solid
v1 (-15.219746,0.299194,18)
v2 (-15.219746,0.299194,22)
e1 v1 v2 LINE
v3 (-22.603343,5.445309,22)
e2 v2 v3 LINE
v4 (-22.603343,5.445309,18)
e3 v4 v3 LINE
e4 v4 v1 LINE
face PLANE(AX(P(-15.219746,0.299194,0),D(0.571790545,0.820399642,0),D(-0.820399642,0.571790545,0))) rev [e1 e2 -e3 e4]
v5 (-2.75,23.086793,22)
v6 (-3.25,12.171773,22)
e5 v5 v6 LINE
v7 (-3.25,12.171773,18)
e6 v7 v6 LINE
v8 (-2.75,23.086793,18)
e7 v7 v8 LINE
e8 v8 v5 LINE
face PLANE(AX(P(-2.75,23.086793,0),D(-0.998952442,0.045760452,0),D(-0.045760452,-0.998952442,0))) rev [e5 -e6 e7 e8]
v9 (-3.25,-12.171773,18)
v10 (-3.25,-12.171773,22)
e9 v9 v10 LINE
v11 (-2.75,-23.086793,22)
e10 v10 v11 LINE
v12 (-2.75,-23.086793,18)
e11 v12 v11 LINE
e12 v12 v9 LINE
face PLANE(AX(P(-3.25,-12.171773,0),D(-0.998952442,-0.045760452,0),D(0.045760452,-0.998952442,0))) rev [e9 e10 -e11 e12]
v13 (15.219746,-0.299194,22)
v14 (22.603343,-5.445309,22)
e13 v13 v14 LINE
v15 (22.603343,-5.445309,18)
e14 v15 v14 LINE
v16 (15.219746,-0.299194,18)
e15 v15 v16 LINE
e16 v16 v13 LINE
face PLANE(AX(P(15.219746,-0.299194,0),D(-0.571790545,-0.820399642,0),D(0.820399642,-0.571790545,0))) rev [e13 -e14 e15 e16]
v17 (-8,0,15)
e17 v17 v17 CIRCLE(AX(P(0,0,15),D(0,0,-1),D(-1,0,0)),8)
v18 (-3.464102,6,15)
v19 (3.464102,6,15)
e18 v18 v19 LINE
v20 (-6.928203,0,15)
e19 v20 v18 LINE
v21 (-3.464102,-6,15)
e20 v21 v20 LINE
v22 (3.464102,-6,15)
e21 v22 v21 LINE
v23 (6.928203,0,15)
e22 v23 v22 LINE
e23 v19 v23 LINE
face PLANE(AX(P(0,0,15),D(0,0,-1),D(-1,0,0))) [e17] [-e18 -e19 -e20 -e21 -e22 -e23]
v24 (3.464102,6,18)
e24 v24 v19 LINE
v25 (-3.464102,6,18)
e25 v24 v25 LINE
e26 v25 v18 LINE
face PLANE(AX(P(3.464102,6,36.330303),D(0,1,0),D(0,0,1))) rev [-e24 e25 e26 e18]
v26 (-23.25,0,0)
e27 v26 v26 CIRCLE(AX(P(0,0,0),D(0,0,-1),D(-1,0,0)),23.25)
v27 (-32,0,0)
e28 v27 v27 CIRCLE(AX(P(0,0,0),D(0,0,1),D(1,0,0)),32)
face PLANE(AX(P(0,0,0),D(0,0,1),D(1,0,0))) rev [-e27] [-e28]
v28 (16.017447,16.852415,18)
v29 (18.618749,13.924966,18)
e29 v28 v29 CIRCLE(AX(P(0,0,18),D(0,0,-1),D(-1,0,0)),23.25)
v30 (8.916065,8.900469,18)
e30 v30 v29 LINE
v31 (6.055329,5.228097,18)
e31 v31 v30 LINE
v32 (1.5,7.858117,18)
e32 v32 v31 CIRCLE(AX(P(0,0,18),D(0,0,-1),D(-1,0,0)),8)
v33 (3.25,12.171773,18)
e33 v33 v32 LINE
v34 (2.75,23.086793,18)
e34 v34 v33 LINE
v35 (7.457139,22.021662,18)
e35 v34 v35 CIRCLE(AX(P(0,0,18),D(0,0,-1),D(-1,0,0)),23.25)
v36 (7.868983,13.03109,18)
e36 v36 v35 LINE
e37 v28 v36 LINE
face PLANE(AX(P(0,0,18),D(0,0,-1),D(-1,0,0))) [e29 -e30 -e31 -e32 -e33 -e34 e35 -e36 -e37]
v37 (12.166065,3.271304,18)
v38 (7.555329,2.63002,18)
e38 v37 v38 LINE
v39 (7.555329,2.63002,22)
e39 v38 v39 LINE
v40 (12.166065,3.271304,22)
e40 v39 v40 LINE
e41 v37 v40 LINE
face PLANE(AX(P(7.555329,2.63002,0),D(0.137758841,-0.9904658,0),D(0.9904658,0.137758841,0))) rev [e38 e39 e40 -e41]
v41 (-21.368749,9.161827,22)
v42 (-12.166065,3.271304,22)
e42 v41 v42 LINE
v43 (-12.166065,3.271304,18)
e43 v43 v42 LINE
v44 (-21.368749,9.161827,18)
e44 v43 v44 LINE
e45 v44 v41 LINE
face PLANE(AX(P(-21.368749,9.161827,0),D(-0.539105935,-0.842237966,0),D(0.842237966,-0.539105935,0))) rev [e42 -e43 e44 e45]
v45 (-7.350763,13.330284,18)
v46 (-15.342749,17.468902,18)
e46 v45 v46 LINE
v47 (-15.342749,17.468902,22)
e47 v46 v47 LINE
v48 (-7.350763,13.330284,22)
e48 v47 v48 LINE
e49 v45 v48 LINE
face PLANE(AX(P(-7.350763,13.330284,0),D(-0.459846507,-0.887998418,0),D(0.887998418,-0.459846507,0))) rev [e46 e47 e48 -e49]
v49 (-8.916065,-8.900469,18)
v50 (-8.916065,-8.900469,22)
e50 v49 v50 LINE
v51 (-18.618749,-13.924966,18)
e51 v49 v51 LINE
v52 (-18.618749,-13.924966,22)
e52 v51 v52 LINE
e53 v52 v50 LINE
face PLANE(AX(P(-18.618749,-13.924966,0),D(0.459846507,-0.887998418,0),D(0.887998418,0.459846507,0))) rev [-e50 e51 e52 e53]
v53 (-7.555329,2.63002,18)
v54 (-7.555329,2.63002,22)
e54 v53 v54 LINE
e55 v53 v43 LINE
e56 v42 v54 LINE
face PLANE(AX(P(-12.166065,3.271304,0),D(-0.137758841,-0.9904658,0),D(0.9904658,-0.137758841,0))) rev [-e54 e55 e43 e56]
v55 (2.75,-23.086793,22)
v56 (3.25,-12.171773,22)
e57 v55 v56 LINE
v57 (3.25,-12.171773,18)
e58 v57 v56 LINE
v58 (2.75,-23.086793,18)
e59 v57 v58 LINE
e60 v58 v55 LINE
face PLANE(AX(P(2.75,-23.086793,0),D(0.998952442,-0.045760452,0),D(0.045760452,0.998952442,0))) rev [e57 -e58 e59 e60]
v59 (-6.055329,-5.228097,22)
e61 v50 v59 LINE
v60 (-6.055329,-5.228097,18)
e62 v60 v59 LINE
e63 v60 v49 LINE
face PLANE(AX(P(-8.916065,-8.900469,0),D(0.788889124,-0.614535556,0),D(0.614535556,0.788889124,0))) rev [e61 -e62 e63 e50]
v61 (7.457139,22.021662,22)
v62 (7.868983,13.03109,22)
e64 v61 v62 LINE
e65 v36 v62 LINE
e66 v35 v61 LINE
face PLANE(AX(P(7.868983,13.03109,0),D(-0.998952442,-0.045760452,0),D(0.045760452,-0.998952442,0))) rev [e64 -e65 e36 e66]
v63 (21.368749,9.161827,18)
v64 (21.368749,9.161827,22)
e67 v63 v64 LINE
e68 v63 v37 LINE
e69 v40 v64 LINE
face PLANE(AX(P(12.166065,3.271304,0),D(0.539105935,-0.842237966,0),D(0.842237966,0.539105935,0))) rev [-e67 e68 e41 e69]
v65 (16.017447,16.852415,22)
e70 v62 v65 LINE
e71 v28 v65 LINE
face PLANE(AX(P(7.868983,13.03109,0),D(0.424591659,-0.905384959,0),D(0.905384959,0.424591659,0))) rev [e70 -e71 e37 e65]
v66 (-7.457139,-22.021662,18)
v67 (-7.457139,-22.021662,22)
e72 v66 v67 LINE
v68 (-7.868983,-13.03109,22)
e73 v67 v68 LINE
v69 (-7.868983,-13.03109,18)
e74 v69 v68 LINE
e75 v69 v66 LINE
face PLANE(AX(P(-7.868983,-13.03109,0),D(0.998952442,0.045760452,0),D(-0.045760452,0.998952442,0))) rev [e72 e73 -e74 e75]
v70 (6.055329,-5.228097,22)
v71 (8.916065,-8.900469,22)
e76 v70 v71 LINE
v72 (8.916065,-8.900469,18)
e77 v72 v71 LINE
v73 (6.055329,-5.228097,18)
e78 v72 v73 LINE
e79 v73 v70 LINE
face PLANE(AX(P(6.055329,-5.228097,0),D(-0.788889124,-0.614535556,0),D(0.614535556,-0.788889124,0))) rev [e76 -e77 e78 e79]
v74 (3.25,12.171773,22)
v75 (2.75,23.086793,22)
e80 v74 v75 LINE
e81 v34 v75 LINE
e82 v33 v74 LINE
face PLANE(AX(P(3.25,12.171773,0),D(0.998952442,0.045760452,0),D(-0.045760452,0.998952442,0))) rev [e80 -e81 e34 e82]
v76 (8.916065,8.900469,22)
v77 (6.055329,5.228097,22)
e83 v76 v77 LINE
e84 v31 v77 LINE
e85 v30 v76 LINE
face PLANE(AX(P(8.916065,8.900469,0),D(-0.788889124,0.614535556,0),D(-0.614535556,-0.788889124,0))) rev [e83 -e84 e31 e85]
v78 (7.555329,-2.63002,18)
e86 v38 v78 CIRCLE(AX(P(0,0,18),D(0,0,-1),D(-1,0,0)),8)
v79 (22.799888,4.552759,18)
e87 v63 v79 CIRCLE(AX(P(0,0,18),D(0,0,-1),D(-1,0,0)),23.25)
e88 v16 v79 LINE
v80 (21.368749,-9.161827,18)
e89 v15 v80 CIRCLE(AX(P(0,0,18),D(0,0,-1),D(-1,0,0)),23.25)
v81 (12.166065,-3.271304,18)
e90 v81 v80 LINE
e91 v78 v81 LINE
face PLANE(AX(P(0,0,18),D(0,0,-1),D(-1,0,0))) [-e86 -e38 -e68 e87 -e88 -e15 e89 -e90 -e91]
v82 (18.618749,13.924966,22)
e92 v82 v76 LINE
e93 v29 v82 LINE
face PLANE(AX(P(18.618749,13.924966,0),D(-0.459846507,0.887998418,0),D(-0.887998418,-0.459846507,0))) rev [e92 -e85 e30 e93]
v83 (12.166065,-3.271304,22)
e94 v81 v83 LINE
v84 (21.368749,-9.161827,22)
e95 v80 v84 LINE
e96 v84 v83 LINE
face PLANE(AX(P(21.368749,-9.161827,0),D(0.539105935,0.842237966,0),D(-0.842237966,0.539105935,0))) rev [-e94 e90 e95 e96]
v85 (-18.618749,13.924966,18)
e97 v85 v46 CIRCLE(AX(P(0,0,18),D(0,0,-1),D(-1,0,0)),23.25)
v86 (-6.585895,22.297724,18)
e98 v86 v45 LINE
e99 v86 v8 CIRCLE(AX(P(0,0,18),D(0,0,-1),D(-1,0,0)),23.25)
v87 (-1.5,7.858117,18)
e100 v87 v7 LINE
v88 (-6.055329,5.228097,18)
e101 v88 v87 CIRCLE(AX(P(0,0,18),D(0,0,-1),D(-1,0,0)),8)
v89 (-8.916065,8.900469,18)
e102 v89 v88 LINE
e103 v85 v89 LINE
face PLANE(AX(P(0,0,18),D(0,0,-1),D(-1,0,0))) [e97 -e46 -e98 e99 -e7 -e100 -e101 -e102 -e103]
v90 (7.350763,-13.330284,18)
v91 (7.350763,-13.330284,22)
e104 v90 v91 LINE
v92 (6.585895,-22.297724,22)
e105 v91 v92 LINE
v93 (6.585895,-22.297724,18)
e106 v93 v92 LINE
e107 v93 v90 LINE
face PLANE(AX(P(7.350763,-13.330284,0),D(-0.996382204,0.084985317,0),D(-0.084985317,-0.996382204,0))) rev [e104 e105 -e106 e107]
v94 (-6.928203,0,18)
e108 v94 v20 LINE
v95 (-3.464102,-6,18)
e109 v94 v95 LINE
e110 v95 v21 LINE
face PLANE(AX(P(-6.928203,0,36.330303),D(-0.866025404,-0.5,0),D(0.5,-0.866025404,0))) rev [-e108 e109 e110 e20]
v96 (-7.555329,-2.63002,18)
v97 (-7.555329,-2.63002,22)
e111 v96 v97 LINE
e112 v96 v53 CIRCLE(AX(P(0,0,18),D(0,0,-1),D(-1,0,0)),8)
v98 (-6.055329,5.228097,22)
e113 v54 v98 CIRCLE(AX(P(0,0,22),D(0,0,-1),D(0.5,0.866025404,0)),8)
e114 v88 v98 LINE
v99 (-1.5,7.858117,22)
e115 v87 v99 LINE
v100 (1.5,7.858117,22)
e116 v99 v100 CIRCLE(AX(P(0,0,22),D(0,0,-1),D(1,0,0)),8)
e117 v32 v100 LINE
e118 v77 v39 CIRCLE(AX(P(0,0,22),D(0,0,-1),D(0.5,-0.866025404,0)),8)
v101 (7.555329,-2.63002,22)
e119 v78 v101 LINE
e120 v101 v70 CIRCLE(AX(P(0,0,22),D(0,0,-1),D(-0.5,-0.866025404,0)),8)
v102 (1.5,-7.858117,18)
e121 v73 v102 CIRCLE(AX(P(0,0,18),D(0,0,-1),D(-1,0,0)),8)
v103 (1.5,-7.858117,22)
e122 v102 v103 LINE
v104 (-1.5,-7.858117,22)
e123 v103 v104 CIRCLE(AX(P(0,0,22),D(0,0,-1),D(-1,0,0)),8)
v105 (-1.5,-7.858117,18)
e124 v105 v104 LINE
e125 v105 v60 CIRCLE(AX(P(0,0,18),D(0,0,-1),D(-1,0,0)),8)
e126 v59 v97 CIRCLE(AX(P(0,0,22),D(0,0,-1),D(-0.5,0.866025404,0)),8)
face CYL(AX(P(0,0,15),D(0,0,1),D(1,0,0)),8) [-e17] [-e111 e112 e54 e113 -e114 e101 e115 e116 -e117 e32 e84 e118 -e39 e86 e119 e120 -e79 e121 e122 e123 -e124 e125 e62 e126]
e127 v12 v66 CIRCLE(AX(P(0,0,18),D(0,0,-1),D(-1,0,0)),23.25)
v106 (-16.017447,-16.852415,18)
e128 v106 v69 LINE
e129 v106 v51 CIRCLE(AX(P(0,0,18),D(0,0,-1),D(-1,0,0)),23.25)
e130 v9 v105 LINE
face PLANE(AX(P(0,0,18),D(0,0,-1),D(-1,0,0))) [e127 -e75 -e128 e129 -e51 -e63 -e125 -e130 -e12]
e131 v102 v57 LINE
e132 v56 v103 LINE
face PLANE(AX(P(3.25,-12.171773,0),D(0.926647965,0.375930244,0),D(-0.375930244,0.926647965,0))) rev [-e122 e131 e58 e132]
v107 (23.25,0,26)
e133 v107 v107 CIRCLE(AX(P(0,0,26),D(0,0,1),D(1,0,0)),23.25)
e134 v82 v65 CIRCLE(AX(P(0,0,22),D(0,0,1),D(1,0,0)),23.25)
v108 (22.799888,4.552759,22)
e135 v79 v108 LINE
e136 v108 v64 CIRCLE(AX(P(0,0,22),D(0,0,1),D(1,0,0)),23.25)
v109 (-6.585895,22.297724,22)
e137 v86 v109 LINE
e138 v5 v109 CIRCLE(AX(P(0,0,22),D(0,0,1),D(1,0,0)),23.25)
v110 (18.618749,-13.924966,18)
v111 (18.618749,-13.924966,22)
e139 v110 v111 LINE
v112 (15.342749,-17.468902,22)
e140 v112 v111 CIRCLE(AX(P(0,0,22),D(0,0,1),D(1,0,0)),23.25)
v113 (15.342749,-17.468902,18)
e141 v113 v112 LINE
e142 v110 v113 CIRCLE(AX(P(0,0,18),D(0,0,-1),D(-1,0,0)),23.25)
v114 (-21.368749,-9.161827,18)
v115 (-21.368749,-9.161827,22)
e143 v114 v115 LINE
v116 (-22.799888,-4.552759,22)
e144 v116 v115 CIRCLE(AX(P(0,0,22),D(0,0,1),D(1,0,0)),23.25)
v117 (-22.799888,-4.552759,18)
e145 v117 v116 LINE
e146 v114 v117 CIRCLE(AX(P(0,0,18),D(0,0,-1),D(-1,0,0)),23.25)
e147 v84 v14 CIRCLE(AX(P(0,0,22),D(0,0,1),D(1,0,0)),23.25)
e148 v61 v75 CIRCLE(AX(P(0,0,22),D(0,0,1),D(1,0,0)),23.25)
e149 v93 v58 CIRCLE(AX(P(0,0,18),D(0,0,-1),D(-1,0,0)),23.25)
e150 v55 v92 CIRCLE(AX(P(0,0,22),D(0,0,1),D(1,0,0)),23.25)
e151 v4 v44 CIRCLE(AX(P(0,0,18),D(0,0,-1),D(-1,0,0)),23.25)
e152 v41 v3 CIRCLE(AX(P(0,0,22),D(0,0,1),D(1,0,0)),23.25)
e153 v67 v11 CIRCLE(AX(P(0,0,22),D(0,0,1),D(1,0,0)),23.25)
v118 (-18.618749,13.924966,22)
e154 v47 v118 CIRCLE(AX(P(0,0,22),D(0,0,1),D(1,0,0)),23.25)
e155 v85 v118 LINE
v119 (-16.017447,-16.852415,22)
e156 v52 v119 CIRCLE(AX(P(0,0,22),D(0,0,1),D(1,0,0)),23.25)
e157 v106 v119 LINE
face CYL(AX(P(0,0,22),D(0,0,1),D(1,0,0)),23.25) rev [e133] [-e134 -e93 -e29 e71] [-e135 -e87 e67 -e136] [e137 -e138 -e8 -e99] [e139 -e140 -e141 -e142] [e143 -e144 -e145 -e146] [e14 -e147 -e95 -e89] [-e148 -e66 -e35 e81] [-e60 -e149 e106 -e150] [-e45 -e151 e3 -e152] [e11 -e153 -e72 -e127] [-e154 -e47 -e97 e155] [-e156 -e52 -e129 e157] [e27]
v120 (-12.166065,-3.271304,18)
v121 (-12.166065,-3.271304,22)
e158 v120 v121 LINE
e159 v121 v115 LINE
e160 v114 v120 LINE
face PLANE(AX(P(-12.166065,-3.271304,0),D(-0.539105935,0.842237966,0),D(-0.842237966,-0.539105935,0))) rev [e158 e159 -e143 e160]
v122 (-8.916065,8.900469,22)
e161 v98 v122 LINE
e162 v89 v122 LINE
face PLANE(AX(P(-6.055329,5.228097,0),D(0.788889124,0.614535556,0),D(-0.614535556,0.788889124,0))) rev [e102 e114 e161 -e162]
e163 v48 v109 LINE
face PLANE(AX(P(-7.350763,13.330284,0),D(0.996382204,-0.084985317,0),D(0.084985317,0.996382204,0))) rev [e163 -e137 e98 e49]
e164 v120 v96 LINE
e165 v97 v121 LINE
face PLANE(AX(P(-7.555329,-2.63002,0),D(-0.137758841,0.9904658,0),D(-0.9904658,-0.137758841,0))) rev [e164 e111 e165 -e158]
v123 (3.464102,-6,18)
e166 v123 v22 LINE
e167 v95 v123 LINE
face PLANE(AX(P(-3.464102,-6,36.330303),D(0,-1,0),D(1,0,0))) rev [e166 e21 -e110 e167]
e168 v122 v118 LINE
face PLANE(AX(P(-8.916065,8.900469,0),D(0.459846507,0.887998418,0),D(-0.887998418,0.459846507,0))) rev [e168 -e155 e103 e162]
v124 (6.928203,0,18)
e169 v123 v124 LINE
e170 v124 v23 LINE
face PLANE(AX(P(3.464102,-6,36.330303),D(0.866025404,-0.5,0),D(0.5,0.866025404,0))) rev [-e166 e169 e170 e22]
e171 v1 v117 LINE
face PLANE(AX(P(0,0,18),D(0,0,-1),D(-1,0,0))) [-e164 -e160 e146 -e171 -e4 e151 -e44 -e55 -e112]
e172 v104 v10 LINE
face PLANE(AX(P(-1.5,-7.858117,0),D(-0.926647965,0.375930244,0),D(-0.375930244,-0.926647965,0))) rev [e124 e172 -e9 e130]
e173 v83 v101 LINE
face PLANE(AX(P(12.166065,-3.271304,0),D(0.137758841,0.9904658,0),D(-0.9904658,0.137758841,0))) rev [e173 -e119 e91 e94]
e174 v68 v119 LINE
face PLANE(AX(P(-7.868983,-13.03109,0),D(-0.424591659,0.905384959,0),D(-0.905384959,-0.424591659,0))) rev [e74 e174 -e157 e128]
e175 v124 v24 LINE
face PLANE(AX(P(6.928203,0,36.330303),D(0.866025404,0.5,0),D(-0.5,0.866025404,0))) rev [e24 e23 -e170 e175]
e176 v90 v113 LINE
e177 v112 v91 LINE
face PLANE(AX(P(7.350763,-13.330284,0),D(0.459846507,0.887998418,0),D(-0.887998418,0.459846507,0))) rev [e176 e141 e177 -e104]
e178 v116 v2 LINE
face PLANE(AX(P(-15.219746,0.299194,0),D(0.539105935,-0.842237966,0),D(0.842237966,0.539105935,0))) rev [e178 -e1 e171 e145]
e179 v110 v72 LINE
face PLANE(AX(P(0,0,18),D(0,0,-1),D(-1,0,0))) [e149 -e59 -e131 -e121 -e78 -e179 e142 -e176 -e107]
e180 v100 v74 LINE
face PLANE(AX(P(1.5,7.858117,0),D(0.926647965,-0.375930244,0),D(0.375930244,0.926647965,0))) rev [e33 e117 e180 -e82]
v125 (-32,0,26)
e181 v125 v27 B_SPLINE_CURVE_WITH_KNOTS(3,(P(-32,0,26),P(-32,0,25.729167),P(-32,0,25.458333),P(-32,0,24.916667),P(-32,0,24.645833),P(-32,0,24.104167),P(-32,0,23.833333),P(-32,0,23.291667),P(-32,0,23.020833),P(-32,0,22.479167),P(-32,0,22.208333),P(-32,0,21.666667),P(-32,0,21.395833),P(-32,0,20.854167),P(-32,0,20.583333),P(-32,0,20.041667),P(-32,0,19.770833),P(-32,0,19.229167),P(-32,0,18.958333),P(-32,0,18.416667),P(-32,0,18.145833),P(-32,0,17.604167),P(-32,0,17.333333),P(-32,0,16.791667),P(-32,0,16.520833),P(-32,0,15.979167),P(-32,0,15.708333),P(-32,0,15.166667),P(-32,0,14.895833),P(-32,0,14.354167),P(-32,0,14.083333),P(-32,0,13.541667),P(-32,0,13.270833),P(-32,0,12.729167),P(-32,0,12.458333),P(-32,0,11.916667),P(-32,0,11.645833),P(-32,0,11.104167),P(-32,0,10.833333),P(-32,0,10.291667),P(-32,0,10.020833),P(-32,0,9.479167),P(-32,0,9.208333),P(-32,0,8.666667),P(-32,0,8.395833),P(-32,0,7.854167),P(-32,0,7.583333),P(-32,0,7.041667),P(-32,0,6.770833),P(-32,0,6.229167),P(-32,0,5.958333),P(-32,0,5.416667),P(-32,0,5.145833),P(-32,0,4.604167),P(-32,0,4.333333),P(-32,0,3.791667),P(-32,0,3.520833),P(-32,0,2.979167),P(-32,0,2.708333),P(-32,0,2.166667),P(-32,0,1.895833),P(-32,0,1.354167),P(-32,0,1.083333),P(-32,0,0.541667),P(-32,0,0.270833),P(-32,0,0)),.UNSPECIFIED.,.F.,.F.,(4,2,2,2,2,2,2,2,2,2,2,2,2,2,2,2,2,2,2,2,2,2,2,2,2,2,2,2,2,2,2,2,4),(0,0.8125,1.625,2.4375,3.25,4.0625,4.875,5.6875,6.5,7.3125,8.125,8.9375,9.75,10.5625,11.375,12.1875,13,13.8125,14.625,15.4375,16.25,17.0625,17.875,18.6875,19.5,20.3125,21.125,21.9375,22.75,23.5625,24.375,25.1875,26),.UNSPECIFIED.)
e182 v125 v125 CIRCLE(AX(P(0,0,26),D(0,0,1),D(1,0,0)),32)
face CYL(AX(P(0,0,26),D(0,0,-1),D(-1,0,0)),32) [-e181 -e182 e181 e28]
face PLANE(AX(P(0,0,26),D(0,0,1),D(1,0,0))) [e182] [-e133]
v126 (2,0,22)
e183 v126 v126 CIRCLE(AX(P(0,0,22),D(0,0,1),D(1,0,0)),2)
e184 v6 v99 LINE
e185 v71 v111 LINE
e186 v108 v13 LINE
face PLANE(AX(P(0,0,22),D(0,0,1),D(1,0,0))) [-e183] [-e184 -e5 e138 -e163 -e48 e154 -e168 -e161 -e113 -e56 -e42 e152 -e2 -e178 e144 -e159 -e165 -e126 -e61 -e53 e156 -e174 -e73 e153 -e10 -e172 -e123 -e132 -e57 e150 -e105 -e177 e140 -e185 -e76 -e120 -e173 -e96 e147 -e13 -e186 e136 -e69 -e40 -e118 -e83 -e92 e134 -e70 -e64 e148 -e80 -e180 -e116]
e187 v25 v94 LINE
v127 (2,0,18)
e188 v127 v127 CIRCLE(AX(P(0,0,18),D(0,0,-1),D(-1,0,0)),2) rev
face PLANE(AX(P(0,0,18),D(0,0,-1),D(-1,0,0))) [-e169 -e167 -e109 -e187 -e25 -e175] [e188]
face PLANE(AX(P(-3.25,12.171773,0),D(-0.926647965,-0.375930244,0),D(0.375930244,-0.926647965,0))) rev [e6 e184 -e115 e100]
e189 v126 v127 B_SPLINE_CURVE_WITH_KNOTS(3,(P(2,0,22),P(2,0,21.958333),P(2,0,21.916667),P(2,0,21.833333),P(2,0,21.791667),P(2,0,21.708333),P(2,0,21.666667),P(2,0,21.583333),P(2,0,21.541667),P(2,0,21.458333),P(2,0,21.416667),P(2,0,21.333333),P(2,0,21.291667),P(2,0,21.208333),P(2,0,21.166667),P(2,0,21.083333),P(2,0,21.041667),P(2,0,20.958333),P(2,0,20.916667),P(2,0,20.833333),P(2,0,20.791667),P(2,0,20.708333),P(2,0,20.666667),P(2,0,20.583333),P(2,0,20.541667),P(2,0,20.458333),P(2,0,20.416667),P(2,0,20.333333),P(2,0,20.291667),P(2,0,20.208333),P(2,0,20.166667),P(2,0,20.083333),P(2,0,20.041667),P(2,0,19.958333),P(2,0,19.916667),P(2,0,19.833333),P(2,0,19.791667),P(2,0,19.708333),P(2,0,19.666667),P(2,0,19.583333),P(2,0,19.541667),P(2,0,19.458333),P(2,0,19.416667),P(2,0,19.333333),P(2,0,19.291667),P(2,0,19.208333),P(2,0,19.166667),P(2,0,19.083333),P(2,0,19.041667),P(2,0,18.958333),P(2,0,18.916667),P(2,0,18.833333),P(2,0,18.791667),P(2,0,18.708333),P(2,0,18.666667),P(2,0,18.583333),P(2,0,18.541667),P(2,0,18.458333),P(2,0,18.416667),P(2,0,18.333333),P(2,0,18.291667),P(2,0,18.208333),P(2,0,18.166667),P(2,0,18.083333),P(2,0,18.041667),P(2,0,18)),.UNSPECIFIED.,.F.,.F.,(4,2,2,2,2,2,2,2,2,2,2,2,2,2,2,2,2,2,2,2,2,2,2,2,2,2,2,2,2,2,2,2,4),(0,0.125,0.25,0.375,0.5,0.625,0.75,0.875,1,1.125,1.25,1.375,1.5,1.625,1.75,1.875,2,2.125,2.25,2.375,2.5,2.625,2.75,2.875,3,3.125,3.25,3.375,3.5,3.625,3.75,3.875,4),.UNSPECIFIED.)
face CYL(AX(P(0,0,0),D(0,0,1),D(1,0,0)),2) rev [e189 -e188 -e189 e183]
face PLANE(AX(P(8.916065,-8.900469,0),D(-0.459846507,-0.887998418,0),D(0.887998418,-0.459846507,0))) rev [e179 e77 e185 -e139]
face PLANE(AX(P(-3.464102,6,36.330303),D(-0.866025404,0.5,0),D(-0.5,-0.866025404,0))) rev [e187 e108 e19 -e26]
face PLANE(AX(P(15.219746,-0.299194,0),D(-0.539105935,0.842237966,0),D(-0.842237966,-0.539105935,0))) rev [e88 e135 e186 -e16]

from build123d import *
from build123d.topology import SkipClean

# Parameters (mm, degrees)
ESQUISSE1_R                  = 32
BOSS_EXTRU_1_DEPTH           = 26
ESQUISSE3_R                  = 23.25
ENL_V_MAT_EXTRU_2_DEPTH      = 4
ENL_V_START                  = -18
ESQUISSE4_R                  = 23.25
ENL_V_MAT_EXTRU_3_DEPTH      = 18
ESQUISSE6_R                  = 8
BOSS_EXTRU_5_DEPTH           = 3
ESQUISSE2_R                  = 2
ENL_V_MAT_EXTRU_4_DEPTH      = 53.191953403
ENL_V_MAT_EXTRU_5_DEPTH      = 3
ENL_V_MAT_EXTRU_8_DEPTH      = 51.318982502
R_P_TITION_CIRCULAIRE1_COUNT = 6
ENL_V_MAT_EXTRU_9_DEPTH      = 51.318982502
R_P_TITION_CIRCULAIRE2_COUNT = 6


with BuildPart() as part:
    # Esquisse1 → Boss.-Extru.1 (new body)
    with BuildSketch(Plane.XY):
        with Locations(Location((0, 0, 0), (0, 0, 180))):
            Circle(ESQUISSE1_R)
    extrude(amount=BOSS_EXTRU_1_DEPTH)

    # Esquisse3 → Enlèv. mat.-Extru.2 (cut)
    with BuildSketch(Plane.XY.offset(26)):
        Circle(ESQUISSE3_R)
    extrude(amount=-ENL_V_MAT_EXTRU_2_DEPTH, mode=Mode.SUBTRACT)

    # Esquisse4 → Enlèv. mat.-Extru.3 (cut)
    with BuildSketch(Plane(origin=(0, 0, 0), x_dir=(-1, 0, 0), z_dir=(0, 0, -1)).offset(ENL_V_START)):
        with Locations(Location((0, 0, 0), (0, 0, 180))):
            Circle(ESQUISSE4_R)
    extrude(amount=ENL_V_MAT_EXTRU_3_DEPTH, mode=Mode.SUBTRACT)

    # Esquisse6 → Boss.-Extru.5 (add)
    with BuildSketch(Plane(origin=(0, 0, 18), x_dir=(-1, 0, 0), z_dir=(0, 0, -1))):
        Circle(ESQUISSE6_R)
    extrude(amount=BOSS_EXTRU_5_DEPTH)

    # Esquisse2 → Enlèv. mat.-Extru.4 (cut, through all)
    with BuildSketch(Plane.XY.offset(26)):
        Circle(ESQUISSE2_R)
    extrude(amount=-ENL_V_MAT_EXTRU_4_DEPTH, mode=Mode.SUBTRACT)

    # Esquisse7 → Enlèv. mat.-Extru.5 (cut)
    with BuildSketch(Plane(origin=(0, 0, 15), x_dir=(-1, 0, 0), z_dir=(0, 0, -1))):
        Polygon((-3.464101615, 6), (3.464101615, 6), (6.92820323, 0), (3.464101615, -6), (-3.464101615, -6), (-6.92820323, 0), align=None)
    extrude(amount=-ENL_V_MAT_EXTRU_5_DEPTH, mode=Mode.SUBTRACT)

    # Esquisse8 → Enlèv. mat.-Extru.8 (cut, through all)
    with BuildSketch(Plane.XY.offset(22)):
        with BuildLine():
            Line((-3.25, 12.171773317), (-1.5, 7.858116823))
            ThreePointArc((-1.5, 7.858116823), (0, 8), (1.5, 7.858116823))
            Line((1.5, 7.858116823), (3.25, 12.171773317))
            Line((3.25, 12.171773317), (2.75, 23.086792761))
            ThreePointArc((2.75, 23.086792761), (0, 23.25), (-2.75, 23.086792761))
            Line((-2.75, 23.086792761), (-3.25, 12.171773317))
        make_face()
    enl_v_mat_extru_8 = extrude(amount=-ENL_V_MAT_EXTRU_8_DEPTH, mode=Mode.SUBTRACT)

    # Répétition circulaire1: Enlèv. mat.-Extru.8 ×6 about axis
    with SkipClean():  # the faces are left unmerged after this step: merging them gives an invalid solid
        r_p_tition_circulaire1_axis = Axis((0, 0, 0), (0, 0, 1))
        for i in range(1, R_P_TITION_CIRCULAIRE1_COUNT):
            add(enl_v_mat_extru_8.rotate(r_p_tition_circulaire1_axis, i * 360 / R_P_TITION_CIRCULAIRE1_COUNT), mode=Mode.SUBTRACT)
    add(part.part.scale(1), mode=Mode.REPLACE)  # the faces are merged on a copy

    # Esquisse9 → Enlèv. mat.-Extru.9 (cut, through all)
    with BuildSketch(Plane.XY.offset(22)):
        with BuildLine():
            Line((7.868982797, 13.031089676), (7.457138731, 22.021661653))
            ThreePointArc((7.457138731, 22.021661653), (12.01849939, 19.902717714), (16.017447426, 16.852414603))
            Line((16.017447426, 16.852414603), (7.868982797, 13.031089676))
        make_face()
    enl_v_mat_extru_9 = extrude(amount=-ENL_V_MAT_EXTRU_9_DEPTH, mode=Mode.SUBTRACT)

    # Répétition circulaire2: Enlèv. mat.-Extru.9 ×6 about axis
    r_p_tition_circulaire2_axis = Axis((0, 0, 0), (0, 0, 1))
    for i in range(1, R_P_TITION_CIRCULAIRE2_COUNT):
        add(enl_v_mat_extru_9.rotate(r_p_tition_circulaire2_axis, i * 360 / R_P_TITION_CIRCULAIRE2_COUNT), mode=Mode.SUBTRACT)


solid = part.part
